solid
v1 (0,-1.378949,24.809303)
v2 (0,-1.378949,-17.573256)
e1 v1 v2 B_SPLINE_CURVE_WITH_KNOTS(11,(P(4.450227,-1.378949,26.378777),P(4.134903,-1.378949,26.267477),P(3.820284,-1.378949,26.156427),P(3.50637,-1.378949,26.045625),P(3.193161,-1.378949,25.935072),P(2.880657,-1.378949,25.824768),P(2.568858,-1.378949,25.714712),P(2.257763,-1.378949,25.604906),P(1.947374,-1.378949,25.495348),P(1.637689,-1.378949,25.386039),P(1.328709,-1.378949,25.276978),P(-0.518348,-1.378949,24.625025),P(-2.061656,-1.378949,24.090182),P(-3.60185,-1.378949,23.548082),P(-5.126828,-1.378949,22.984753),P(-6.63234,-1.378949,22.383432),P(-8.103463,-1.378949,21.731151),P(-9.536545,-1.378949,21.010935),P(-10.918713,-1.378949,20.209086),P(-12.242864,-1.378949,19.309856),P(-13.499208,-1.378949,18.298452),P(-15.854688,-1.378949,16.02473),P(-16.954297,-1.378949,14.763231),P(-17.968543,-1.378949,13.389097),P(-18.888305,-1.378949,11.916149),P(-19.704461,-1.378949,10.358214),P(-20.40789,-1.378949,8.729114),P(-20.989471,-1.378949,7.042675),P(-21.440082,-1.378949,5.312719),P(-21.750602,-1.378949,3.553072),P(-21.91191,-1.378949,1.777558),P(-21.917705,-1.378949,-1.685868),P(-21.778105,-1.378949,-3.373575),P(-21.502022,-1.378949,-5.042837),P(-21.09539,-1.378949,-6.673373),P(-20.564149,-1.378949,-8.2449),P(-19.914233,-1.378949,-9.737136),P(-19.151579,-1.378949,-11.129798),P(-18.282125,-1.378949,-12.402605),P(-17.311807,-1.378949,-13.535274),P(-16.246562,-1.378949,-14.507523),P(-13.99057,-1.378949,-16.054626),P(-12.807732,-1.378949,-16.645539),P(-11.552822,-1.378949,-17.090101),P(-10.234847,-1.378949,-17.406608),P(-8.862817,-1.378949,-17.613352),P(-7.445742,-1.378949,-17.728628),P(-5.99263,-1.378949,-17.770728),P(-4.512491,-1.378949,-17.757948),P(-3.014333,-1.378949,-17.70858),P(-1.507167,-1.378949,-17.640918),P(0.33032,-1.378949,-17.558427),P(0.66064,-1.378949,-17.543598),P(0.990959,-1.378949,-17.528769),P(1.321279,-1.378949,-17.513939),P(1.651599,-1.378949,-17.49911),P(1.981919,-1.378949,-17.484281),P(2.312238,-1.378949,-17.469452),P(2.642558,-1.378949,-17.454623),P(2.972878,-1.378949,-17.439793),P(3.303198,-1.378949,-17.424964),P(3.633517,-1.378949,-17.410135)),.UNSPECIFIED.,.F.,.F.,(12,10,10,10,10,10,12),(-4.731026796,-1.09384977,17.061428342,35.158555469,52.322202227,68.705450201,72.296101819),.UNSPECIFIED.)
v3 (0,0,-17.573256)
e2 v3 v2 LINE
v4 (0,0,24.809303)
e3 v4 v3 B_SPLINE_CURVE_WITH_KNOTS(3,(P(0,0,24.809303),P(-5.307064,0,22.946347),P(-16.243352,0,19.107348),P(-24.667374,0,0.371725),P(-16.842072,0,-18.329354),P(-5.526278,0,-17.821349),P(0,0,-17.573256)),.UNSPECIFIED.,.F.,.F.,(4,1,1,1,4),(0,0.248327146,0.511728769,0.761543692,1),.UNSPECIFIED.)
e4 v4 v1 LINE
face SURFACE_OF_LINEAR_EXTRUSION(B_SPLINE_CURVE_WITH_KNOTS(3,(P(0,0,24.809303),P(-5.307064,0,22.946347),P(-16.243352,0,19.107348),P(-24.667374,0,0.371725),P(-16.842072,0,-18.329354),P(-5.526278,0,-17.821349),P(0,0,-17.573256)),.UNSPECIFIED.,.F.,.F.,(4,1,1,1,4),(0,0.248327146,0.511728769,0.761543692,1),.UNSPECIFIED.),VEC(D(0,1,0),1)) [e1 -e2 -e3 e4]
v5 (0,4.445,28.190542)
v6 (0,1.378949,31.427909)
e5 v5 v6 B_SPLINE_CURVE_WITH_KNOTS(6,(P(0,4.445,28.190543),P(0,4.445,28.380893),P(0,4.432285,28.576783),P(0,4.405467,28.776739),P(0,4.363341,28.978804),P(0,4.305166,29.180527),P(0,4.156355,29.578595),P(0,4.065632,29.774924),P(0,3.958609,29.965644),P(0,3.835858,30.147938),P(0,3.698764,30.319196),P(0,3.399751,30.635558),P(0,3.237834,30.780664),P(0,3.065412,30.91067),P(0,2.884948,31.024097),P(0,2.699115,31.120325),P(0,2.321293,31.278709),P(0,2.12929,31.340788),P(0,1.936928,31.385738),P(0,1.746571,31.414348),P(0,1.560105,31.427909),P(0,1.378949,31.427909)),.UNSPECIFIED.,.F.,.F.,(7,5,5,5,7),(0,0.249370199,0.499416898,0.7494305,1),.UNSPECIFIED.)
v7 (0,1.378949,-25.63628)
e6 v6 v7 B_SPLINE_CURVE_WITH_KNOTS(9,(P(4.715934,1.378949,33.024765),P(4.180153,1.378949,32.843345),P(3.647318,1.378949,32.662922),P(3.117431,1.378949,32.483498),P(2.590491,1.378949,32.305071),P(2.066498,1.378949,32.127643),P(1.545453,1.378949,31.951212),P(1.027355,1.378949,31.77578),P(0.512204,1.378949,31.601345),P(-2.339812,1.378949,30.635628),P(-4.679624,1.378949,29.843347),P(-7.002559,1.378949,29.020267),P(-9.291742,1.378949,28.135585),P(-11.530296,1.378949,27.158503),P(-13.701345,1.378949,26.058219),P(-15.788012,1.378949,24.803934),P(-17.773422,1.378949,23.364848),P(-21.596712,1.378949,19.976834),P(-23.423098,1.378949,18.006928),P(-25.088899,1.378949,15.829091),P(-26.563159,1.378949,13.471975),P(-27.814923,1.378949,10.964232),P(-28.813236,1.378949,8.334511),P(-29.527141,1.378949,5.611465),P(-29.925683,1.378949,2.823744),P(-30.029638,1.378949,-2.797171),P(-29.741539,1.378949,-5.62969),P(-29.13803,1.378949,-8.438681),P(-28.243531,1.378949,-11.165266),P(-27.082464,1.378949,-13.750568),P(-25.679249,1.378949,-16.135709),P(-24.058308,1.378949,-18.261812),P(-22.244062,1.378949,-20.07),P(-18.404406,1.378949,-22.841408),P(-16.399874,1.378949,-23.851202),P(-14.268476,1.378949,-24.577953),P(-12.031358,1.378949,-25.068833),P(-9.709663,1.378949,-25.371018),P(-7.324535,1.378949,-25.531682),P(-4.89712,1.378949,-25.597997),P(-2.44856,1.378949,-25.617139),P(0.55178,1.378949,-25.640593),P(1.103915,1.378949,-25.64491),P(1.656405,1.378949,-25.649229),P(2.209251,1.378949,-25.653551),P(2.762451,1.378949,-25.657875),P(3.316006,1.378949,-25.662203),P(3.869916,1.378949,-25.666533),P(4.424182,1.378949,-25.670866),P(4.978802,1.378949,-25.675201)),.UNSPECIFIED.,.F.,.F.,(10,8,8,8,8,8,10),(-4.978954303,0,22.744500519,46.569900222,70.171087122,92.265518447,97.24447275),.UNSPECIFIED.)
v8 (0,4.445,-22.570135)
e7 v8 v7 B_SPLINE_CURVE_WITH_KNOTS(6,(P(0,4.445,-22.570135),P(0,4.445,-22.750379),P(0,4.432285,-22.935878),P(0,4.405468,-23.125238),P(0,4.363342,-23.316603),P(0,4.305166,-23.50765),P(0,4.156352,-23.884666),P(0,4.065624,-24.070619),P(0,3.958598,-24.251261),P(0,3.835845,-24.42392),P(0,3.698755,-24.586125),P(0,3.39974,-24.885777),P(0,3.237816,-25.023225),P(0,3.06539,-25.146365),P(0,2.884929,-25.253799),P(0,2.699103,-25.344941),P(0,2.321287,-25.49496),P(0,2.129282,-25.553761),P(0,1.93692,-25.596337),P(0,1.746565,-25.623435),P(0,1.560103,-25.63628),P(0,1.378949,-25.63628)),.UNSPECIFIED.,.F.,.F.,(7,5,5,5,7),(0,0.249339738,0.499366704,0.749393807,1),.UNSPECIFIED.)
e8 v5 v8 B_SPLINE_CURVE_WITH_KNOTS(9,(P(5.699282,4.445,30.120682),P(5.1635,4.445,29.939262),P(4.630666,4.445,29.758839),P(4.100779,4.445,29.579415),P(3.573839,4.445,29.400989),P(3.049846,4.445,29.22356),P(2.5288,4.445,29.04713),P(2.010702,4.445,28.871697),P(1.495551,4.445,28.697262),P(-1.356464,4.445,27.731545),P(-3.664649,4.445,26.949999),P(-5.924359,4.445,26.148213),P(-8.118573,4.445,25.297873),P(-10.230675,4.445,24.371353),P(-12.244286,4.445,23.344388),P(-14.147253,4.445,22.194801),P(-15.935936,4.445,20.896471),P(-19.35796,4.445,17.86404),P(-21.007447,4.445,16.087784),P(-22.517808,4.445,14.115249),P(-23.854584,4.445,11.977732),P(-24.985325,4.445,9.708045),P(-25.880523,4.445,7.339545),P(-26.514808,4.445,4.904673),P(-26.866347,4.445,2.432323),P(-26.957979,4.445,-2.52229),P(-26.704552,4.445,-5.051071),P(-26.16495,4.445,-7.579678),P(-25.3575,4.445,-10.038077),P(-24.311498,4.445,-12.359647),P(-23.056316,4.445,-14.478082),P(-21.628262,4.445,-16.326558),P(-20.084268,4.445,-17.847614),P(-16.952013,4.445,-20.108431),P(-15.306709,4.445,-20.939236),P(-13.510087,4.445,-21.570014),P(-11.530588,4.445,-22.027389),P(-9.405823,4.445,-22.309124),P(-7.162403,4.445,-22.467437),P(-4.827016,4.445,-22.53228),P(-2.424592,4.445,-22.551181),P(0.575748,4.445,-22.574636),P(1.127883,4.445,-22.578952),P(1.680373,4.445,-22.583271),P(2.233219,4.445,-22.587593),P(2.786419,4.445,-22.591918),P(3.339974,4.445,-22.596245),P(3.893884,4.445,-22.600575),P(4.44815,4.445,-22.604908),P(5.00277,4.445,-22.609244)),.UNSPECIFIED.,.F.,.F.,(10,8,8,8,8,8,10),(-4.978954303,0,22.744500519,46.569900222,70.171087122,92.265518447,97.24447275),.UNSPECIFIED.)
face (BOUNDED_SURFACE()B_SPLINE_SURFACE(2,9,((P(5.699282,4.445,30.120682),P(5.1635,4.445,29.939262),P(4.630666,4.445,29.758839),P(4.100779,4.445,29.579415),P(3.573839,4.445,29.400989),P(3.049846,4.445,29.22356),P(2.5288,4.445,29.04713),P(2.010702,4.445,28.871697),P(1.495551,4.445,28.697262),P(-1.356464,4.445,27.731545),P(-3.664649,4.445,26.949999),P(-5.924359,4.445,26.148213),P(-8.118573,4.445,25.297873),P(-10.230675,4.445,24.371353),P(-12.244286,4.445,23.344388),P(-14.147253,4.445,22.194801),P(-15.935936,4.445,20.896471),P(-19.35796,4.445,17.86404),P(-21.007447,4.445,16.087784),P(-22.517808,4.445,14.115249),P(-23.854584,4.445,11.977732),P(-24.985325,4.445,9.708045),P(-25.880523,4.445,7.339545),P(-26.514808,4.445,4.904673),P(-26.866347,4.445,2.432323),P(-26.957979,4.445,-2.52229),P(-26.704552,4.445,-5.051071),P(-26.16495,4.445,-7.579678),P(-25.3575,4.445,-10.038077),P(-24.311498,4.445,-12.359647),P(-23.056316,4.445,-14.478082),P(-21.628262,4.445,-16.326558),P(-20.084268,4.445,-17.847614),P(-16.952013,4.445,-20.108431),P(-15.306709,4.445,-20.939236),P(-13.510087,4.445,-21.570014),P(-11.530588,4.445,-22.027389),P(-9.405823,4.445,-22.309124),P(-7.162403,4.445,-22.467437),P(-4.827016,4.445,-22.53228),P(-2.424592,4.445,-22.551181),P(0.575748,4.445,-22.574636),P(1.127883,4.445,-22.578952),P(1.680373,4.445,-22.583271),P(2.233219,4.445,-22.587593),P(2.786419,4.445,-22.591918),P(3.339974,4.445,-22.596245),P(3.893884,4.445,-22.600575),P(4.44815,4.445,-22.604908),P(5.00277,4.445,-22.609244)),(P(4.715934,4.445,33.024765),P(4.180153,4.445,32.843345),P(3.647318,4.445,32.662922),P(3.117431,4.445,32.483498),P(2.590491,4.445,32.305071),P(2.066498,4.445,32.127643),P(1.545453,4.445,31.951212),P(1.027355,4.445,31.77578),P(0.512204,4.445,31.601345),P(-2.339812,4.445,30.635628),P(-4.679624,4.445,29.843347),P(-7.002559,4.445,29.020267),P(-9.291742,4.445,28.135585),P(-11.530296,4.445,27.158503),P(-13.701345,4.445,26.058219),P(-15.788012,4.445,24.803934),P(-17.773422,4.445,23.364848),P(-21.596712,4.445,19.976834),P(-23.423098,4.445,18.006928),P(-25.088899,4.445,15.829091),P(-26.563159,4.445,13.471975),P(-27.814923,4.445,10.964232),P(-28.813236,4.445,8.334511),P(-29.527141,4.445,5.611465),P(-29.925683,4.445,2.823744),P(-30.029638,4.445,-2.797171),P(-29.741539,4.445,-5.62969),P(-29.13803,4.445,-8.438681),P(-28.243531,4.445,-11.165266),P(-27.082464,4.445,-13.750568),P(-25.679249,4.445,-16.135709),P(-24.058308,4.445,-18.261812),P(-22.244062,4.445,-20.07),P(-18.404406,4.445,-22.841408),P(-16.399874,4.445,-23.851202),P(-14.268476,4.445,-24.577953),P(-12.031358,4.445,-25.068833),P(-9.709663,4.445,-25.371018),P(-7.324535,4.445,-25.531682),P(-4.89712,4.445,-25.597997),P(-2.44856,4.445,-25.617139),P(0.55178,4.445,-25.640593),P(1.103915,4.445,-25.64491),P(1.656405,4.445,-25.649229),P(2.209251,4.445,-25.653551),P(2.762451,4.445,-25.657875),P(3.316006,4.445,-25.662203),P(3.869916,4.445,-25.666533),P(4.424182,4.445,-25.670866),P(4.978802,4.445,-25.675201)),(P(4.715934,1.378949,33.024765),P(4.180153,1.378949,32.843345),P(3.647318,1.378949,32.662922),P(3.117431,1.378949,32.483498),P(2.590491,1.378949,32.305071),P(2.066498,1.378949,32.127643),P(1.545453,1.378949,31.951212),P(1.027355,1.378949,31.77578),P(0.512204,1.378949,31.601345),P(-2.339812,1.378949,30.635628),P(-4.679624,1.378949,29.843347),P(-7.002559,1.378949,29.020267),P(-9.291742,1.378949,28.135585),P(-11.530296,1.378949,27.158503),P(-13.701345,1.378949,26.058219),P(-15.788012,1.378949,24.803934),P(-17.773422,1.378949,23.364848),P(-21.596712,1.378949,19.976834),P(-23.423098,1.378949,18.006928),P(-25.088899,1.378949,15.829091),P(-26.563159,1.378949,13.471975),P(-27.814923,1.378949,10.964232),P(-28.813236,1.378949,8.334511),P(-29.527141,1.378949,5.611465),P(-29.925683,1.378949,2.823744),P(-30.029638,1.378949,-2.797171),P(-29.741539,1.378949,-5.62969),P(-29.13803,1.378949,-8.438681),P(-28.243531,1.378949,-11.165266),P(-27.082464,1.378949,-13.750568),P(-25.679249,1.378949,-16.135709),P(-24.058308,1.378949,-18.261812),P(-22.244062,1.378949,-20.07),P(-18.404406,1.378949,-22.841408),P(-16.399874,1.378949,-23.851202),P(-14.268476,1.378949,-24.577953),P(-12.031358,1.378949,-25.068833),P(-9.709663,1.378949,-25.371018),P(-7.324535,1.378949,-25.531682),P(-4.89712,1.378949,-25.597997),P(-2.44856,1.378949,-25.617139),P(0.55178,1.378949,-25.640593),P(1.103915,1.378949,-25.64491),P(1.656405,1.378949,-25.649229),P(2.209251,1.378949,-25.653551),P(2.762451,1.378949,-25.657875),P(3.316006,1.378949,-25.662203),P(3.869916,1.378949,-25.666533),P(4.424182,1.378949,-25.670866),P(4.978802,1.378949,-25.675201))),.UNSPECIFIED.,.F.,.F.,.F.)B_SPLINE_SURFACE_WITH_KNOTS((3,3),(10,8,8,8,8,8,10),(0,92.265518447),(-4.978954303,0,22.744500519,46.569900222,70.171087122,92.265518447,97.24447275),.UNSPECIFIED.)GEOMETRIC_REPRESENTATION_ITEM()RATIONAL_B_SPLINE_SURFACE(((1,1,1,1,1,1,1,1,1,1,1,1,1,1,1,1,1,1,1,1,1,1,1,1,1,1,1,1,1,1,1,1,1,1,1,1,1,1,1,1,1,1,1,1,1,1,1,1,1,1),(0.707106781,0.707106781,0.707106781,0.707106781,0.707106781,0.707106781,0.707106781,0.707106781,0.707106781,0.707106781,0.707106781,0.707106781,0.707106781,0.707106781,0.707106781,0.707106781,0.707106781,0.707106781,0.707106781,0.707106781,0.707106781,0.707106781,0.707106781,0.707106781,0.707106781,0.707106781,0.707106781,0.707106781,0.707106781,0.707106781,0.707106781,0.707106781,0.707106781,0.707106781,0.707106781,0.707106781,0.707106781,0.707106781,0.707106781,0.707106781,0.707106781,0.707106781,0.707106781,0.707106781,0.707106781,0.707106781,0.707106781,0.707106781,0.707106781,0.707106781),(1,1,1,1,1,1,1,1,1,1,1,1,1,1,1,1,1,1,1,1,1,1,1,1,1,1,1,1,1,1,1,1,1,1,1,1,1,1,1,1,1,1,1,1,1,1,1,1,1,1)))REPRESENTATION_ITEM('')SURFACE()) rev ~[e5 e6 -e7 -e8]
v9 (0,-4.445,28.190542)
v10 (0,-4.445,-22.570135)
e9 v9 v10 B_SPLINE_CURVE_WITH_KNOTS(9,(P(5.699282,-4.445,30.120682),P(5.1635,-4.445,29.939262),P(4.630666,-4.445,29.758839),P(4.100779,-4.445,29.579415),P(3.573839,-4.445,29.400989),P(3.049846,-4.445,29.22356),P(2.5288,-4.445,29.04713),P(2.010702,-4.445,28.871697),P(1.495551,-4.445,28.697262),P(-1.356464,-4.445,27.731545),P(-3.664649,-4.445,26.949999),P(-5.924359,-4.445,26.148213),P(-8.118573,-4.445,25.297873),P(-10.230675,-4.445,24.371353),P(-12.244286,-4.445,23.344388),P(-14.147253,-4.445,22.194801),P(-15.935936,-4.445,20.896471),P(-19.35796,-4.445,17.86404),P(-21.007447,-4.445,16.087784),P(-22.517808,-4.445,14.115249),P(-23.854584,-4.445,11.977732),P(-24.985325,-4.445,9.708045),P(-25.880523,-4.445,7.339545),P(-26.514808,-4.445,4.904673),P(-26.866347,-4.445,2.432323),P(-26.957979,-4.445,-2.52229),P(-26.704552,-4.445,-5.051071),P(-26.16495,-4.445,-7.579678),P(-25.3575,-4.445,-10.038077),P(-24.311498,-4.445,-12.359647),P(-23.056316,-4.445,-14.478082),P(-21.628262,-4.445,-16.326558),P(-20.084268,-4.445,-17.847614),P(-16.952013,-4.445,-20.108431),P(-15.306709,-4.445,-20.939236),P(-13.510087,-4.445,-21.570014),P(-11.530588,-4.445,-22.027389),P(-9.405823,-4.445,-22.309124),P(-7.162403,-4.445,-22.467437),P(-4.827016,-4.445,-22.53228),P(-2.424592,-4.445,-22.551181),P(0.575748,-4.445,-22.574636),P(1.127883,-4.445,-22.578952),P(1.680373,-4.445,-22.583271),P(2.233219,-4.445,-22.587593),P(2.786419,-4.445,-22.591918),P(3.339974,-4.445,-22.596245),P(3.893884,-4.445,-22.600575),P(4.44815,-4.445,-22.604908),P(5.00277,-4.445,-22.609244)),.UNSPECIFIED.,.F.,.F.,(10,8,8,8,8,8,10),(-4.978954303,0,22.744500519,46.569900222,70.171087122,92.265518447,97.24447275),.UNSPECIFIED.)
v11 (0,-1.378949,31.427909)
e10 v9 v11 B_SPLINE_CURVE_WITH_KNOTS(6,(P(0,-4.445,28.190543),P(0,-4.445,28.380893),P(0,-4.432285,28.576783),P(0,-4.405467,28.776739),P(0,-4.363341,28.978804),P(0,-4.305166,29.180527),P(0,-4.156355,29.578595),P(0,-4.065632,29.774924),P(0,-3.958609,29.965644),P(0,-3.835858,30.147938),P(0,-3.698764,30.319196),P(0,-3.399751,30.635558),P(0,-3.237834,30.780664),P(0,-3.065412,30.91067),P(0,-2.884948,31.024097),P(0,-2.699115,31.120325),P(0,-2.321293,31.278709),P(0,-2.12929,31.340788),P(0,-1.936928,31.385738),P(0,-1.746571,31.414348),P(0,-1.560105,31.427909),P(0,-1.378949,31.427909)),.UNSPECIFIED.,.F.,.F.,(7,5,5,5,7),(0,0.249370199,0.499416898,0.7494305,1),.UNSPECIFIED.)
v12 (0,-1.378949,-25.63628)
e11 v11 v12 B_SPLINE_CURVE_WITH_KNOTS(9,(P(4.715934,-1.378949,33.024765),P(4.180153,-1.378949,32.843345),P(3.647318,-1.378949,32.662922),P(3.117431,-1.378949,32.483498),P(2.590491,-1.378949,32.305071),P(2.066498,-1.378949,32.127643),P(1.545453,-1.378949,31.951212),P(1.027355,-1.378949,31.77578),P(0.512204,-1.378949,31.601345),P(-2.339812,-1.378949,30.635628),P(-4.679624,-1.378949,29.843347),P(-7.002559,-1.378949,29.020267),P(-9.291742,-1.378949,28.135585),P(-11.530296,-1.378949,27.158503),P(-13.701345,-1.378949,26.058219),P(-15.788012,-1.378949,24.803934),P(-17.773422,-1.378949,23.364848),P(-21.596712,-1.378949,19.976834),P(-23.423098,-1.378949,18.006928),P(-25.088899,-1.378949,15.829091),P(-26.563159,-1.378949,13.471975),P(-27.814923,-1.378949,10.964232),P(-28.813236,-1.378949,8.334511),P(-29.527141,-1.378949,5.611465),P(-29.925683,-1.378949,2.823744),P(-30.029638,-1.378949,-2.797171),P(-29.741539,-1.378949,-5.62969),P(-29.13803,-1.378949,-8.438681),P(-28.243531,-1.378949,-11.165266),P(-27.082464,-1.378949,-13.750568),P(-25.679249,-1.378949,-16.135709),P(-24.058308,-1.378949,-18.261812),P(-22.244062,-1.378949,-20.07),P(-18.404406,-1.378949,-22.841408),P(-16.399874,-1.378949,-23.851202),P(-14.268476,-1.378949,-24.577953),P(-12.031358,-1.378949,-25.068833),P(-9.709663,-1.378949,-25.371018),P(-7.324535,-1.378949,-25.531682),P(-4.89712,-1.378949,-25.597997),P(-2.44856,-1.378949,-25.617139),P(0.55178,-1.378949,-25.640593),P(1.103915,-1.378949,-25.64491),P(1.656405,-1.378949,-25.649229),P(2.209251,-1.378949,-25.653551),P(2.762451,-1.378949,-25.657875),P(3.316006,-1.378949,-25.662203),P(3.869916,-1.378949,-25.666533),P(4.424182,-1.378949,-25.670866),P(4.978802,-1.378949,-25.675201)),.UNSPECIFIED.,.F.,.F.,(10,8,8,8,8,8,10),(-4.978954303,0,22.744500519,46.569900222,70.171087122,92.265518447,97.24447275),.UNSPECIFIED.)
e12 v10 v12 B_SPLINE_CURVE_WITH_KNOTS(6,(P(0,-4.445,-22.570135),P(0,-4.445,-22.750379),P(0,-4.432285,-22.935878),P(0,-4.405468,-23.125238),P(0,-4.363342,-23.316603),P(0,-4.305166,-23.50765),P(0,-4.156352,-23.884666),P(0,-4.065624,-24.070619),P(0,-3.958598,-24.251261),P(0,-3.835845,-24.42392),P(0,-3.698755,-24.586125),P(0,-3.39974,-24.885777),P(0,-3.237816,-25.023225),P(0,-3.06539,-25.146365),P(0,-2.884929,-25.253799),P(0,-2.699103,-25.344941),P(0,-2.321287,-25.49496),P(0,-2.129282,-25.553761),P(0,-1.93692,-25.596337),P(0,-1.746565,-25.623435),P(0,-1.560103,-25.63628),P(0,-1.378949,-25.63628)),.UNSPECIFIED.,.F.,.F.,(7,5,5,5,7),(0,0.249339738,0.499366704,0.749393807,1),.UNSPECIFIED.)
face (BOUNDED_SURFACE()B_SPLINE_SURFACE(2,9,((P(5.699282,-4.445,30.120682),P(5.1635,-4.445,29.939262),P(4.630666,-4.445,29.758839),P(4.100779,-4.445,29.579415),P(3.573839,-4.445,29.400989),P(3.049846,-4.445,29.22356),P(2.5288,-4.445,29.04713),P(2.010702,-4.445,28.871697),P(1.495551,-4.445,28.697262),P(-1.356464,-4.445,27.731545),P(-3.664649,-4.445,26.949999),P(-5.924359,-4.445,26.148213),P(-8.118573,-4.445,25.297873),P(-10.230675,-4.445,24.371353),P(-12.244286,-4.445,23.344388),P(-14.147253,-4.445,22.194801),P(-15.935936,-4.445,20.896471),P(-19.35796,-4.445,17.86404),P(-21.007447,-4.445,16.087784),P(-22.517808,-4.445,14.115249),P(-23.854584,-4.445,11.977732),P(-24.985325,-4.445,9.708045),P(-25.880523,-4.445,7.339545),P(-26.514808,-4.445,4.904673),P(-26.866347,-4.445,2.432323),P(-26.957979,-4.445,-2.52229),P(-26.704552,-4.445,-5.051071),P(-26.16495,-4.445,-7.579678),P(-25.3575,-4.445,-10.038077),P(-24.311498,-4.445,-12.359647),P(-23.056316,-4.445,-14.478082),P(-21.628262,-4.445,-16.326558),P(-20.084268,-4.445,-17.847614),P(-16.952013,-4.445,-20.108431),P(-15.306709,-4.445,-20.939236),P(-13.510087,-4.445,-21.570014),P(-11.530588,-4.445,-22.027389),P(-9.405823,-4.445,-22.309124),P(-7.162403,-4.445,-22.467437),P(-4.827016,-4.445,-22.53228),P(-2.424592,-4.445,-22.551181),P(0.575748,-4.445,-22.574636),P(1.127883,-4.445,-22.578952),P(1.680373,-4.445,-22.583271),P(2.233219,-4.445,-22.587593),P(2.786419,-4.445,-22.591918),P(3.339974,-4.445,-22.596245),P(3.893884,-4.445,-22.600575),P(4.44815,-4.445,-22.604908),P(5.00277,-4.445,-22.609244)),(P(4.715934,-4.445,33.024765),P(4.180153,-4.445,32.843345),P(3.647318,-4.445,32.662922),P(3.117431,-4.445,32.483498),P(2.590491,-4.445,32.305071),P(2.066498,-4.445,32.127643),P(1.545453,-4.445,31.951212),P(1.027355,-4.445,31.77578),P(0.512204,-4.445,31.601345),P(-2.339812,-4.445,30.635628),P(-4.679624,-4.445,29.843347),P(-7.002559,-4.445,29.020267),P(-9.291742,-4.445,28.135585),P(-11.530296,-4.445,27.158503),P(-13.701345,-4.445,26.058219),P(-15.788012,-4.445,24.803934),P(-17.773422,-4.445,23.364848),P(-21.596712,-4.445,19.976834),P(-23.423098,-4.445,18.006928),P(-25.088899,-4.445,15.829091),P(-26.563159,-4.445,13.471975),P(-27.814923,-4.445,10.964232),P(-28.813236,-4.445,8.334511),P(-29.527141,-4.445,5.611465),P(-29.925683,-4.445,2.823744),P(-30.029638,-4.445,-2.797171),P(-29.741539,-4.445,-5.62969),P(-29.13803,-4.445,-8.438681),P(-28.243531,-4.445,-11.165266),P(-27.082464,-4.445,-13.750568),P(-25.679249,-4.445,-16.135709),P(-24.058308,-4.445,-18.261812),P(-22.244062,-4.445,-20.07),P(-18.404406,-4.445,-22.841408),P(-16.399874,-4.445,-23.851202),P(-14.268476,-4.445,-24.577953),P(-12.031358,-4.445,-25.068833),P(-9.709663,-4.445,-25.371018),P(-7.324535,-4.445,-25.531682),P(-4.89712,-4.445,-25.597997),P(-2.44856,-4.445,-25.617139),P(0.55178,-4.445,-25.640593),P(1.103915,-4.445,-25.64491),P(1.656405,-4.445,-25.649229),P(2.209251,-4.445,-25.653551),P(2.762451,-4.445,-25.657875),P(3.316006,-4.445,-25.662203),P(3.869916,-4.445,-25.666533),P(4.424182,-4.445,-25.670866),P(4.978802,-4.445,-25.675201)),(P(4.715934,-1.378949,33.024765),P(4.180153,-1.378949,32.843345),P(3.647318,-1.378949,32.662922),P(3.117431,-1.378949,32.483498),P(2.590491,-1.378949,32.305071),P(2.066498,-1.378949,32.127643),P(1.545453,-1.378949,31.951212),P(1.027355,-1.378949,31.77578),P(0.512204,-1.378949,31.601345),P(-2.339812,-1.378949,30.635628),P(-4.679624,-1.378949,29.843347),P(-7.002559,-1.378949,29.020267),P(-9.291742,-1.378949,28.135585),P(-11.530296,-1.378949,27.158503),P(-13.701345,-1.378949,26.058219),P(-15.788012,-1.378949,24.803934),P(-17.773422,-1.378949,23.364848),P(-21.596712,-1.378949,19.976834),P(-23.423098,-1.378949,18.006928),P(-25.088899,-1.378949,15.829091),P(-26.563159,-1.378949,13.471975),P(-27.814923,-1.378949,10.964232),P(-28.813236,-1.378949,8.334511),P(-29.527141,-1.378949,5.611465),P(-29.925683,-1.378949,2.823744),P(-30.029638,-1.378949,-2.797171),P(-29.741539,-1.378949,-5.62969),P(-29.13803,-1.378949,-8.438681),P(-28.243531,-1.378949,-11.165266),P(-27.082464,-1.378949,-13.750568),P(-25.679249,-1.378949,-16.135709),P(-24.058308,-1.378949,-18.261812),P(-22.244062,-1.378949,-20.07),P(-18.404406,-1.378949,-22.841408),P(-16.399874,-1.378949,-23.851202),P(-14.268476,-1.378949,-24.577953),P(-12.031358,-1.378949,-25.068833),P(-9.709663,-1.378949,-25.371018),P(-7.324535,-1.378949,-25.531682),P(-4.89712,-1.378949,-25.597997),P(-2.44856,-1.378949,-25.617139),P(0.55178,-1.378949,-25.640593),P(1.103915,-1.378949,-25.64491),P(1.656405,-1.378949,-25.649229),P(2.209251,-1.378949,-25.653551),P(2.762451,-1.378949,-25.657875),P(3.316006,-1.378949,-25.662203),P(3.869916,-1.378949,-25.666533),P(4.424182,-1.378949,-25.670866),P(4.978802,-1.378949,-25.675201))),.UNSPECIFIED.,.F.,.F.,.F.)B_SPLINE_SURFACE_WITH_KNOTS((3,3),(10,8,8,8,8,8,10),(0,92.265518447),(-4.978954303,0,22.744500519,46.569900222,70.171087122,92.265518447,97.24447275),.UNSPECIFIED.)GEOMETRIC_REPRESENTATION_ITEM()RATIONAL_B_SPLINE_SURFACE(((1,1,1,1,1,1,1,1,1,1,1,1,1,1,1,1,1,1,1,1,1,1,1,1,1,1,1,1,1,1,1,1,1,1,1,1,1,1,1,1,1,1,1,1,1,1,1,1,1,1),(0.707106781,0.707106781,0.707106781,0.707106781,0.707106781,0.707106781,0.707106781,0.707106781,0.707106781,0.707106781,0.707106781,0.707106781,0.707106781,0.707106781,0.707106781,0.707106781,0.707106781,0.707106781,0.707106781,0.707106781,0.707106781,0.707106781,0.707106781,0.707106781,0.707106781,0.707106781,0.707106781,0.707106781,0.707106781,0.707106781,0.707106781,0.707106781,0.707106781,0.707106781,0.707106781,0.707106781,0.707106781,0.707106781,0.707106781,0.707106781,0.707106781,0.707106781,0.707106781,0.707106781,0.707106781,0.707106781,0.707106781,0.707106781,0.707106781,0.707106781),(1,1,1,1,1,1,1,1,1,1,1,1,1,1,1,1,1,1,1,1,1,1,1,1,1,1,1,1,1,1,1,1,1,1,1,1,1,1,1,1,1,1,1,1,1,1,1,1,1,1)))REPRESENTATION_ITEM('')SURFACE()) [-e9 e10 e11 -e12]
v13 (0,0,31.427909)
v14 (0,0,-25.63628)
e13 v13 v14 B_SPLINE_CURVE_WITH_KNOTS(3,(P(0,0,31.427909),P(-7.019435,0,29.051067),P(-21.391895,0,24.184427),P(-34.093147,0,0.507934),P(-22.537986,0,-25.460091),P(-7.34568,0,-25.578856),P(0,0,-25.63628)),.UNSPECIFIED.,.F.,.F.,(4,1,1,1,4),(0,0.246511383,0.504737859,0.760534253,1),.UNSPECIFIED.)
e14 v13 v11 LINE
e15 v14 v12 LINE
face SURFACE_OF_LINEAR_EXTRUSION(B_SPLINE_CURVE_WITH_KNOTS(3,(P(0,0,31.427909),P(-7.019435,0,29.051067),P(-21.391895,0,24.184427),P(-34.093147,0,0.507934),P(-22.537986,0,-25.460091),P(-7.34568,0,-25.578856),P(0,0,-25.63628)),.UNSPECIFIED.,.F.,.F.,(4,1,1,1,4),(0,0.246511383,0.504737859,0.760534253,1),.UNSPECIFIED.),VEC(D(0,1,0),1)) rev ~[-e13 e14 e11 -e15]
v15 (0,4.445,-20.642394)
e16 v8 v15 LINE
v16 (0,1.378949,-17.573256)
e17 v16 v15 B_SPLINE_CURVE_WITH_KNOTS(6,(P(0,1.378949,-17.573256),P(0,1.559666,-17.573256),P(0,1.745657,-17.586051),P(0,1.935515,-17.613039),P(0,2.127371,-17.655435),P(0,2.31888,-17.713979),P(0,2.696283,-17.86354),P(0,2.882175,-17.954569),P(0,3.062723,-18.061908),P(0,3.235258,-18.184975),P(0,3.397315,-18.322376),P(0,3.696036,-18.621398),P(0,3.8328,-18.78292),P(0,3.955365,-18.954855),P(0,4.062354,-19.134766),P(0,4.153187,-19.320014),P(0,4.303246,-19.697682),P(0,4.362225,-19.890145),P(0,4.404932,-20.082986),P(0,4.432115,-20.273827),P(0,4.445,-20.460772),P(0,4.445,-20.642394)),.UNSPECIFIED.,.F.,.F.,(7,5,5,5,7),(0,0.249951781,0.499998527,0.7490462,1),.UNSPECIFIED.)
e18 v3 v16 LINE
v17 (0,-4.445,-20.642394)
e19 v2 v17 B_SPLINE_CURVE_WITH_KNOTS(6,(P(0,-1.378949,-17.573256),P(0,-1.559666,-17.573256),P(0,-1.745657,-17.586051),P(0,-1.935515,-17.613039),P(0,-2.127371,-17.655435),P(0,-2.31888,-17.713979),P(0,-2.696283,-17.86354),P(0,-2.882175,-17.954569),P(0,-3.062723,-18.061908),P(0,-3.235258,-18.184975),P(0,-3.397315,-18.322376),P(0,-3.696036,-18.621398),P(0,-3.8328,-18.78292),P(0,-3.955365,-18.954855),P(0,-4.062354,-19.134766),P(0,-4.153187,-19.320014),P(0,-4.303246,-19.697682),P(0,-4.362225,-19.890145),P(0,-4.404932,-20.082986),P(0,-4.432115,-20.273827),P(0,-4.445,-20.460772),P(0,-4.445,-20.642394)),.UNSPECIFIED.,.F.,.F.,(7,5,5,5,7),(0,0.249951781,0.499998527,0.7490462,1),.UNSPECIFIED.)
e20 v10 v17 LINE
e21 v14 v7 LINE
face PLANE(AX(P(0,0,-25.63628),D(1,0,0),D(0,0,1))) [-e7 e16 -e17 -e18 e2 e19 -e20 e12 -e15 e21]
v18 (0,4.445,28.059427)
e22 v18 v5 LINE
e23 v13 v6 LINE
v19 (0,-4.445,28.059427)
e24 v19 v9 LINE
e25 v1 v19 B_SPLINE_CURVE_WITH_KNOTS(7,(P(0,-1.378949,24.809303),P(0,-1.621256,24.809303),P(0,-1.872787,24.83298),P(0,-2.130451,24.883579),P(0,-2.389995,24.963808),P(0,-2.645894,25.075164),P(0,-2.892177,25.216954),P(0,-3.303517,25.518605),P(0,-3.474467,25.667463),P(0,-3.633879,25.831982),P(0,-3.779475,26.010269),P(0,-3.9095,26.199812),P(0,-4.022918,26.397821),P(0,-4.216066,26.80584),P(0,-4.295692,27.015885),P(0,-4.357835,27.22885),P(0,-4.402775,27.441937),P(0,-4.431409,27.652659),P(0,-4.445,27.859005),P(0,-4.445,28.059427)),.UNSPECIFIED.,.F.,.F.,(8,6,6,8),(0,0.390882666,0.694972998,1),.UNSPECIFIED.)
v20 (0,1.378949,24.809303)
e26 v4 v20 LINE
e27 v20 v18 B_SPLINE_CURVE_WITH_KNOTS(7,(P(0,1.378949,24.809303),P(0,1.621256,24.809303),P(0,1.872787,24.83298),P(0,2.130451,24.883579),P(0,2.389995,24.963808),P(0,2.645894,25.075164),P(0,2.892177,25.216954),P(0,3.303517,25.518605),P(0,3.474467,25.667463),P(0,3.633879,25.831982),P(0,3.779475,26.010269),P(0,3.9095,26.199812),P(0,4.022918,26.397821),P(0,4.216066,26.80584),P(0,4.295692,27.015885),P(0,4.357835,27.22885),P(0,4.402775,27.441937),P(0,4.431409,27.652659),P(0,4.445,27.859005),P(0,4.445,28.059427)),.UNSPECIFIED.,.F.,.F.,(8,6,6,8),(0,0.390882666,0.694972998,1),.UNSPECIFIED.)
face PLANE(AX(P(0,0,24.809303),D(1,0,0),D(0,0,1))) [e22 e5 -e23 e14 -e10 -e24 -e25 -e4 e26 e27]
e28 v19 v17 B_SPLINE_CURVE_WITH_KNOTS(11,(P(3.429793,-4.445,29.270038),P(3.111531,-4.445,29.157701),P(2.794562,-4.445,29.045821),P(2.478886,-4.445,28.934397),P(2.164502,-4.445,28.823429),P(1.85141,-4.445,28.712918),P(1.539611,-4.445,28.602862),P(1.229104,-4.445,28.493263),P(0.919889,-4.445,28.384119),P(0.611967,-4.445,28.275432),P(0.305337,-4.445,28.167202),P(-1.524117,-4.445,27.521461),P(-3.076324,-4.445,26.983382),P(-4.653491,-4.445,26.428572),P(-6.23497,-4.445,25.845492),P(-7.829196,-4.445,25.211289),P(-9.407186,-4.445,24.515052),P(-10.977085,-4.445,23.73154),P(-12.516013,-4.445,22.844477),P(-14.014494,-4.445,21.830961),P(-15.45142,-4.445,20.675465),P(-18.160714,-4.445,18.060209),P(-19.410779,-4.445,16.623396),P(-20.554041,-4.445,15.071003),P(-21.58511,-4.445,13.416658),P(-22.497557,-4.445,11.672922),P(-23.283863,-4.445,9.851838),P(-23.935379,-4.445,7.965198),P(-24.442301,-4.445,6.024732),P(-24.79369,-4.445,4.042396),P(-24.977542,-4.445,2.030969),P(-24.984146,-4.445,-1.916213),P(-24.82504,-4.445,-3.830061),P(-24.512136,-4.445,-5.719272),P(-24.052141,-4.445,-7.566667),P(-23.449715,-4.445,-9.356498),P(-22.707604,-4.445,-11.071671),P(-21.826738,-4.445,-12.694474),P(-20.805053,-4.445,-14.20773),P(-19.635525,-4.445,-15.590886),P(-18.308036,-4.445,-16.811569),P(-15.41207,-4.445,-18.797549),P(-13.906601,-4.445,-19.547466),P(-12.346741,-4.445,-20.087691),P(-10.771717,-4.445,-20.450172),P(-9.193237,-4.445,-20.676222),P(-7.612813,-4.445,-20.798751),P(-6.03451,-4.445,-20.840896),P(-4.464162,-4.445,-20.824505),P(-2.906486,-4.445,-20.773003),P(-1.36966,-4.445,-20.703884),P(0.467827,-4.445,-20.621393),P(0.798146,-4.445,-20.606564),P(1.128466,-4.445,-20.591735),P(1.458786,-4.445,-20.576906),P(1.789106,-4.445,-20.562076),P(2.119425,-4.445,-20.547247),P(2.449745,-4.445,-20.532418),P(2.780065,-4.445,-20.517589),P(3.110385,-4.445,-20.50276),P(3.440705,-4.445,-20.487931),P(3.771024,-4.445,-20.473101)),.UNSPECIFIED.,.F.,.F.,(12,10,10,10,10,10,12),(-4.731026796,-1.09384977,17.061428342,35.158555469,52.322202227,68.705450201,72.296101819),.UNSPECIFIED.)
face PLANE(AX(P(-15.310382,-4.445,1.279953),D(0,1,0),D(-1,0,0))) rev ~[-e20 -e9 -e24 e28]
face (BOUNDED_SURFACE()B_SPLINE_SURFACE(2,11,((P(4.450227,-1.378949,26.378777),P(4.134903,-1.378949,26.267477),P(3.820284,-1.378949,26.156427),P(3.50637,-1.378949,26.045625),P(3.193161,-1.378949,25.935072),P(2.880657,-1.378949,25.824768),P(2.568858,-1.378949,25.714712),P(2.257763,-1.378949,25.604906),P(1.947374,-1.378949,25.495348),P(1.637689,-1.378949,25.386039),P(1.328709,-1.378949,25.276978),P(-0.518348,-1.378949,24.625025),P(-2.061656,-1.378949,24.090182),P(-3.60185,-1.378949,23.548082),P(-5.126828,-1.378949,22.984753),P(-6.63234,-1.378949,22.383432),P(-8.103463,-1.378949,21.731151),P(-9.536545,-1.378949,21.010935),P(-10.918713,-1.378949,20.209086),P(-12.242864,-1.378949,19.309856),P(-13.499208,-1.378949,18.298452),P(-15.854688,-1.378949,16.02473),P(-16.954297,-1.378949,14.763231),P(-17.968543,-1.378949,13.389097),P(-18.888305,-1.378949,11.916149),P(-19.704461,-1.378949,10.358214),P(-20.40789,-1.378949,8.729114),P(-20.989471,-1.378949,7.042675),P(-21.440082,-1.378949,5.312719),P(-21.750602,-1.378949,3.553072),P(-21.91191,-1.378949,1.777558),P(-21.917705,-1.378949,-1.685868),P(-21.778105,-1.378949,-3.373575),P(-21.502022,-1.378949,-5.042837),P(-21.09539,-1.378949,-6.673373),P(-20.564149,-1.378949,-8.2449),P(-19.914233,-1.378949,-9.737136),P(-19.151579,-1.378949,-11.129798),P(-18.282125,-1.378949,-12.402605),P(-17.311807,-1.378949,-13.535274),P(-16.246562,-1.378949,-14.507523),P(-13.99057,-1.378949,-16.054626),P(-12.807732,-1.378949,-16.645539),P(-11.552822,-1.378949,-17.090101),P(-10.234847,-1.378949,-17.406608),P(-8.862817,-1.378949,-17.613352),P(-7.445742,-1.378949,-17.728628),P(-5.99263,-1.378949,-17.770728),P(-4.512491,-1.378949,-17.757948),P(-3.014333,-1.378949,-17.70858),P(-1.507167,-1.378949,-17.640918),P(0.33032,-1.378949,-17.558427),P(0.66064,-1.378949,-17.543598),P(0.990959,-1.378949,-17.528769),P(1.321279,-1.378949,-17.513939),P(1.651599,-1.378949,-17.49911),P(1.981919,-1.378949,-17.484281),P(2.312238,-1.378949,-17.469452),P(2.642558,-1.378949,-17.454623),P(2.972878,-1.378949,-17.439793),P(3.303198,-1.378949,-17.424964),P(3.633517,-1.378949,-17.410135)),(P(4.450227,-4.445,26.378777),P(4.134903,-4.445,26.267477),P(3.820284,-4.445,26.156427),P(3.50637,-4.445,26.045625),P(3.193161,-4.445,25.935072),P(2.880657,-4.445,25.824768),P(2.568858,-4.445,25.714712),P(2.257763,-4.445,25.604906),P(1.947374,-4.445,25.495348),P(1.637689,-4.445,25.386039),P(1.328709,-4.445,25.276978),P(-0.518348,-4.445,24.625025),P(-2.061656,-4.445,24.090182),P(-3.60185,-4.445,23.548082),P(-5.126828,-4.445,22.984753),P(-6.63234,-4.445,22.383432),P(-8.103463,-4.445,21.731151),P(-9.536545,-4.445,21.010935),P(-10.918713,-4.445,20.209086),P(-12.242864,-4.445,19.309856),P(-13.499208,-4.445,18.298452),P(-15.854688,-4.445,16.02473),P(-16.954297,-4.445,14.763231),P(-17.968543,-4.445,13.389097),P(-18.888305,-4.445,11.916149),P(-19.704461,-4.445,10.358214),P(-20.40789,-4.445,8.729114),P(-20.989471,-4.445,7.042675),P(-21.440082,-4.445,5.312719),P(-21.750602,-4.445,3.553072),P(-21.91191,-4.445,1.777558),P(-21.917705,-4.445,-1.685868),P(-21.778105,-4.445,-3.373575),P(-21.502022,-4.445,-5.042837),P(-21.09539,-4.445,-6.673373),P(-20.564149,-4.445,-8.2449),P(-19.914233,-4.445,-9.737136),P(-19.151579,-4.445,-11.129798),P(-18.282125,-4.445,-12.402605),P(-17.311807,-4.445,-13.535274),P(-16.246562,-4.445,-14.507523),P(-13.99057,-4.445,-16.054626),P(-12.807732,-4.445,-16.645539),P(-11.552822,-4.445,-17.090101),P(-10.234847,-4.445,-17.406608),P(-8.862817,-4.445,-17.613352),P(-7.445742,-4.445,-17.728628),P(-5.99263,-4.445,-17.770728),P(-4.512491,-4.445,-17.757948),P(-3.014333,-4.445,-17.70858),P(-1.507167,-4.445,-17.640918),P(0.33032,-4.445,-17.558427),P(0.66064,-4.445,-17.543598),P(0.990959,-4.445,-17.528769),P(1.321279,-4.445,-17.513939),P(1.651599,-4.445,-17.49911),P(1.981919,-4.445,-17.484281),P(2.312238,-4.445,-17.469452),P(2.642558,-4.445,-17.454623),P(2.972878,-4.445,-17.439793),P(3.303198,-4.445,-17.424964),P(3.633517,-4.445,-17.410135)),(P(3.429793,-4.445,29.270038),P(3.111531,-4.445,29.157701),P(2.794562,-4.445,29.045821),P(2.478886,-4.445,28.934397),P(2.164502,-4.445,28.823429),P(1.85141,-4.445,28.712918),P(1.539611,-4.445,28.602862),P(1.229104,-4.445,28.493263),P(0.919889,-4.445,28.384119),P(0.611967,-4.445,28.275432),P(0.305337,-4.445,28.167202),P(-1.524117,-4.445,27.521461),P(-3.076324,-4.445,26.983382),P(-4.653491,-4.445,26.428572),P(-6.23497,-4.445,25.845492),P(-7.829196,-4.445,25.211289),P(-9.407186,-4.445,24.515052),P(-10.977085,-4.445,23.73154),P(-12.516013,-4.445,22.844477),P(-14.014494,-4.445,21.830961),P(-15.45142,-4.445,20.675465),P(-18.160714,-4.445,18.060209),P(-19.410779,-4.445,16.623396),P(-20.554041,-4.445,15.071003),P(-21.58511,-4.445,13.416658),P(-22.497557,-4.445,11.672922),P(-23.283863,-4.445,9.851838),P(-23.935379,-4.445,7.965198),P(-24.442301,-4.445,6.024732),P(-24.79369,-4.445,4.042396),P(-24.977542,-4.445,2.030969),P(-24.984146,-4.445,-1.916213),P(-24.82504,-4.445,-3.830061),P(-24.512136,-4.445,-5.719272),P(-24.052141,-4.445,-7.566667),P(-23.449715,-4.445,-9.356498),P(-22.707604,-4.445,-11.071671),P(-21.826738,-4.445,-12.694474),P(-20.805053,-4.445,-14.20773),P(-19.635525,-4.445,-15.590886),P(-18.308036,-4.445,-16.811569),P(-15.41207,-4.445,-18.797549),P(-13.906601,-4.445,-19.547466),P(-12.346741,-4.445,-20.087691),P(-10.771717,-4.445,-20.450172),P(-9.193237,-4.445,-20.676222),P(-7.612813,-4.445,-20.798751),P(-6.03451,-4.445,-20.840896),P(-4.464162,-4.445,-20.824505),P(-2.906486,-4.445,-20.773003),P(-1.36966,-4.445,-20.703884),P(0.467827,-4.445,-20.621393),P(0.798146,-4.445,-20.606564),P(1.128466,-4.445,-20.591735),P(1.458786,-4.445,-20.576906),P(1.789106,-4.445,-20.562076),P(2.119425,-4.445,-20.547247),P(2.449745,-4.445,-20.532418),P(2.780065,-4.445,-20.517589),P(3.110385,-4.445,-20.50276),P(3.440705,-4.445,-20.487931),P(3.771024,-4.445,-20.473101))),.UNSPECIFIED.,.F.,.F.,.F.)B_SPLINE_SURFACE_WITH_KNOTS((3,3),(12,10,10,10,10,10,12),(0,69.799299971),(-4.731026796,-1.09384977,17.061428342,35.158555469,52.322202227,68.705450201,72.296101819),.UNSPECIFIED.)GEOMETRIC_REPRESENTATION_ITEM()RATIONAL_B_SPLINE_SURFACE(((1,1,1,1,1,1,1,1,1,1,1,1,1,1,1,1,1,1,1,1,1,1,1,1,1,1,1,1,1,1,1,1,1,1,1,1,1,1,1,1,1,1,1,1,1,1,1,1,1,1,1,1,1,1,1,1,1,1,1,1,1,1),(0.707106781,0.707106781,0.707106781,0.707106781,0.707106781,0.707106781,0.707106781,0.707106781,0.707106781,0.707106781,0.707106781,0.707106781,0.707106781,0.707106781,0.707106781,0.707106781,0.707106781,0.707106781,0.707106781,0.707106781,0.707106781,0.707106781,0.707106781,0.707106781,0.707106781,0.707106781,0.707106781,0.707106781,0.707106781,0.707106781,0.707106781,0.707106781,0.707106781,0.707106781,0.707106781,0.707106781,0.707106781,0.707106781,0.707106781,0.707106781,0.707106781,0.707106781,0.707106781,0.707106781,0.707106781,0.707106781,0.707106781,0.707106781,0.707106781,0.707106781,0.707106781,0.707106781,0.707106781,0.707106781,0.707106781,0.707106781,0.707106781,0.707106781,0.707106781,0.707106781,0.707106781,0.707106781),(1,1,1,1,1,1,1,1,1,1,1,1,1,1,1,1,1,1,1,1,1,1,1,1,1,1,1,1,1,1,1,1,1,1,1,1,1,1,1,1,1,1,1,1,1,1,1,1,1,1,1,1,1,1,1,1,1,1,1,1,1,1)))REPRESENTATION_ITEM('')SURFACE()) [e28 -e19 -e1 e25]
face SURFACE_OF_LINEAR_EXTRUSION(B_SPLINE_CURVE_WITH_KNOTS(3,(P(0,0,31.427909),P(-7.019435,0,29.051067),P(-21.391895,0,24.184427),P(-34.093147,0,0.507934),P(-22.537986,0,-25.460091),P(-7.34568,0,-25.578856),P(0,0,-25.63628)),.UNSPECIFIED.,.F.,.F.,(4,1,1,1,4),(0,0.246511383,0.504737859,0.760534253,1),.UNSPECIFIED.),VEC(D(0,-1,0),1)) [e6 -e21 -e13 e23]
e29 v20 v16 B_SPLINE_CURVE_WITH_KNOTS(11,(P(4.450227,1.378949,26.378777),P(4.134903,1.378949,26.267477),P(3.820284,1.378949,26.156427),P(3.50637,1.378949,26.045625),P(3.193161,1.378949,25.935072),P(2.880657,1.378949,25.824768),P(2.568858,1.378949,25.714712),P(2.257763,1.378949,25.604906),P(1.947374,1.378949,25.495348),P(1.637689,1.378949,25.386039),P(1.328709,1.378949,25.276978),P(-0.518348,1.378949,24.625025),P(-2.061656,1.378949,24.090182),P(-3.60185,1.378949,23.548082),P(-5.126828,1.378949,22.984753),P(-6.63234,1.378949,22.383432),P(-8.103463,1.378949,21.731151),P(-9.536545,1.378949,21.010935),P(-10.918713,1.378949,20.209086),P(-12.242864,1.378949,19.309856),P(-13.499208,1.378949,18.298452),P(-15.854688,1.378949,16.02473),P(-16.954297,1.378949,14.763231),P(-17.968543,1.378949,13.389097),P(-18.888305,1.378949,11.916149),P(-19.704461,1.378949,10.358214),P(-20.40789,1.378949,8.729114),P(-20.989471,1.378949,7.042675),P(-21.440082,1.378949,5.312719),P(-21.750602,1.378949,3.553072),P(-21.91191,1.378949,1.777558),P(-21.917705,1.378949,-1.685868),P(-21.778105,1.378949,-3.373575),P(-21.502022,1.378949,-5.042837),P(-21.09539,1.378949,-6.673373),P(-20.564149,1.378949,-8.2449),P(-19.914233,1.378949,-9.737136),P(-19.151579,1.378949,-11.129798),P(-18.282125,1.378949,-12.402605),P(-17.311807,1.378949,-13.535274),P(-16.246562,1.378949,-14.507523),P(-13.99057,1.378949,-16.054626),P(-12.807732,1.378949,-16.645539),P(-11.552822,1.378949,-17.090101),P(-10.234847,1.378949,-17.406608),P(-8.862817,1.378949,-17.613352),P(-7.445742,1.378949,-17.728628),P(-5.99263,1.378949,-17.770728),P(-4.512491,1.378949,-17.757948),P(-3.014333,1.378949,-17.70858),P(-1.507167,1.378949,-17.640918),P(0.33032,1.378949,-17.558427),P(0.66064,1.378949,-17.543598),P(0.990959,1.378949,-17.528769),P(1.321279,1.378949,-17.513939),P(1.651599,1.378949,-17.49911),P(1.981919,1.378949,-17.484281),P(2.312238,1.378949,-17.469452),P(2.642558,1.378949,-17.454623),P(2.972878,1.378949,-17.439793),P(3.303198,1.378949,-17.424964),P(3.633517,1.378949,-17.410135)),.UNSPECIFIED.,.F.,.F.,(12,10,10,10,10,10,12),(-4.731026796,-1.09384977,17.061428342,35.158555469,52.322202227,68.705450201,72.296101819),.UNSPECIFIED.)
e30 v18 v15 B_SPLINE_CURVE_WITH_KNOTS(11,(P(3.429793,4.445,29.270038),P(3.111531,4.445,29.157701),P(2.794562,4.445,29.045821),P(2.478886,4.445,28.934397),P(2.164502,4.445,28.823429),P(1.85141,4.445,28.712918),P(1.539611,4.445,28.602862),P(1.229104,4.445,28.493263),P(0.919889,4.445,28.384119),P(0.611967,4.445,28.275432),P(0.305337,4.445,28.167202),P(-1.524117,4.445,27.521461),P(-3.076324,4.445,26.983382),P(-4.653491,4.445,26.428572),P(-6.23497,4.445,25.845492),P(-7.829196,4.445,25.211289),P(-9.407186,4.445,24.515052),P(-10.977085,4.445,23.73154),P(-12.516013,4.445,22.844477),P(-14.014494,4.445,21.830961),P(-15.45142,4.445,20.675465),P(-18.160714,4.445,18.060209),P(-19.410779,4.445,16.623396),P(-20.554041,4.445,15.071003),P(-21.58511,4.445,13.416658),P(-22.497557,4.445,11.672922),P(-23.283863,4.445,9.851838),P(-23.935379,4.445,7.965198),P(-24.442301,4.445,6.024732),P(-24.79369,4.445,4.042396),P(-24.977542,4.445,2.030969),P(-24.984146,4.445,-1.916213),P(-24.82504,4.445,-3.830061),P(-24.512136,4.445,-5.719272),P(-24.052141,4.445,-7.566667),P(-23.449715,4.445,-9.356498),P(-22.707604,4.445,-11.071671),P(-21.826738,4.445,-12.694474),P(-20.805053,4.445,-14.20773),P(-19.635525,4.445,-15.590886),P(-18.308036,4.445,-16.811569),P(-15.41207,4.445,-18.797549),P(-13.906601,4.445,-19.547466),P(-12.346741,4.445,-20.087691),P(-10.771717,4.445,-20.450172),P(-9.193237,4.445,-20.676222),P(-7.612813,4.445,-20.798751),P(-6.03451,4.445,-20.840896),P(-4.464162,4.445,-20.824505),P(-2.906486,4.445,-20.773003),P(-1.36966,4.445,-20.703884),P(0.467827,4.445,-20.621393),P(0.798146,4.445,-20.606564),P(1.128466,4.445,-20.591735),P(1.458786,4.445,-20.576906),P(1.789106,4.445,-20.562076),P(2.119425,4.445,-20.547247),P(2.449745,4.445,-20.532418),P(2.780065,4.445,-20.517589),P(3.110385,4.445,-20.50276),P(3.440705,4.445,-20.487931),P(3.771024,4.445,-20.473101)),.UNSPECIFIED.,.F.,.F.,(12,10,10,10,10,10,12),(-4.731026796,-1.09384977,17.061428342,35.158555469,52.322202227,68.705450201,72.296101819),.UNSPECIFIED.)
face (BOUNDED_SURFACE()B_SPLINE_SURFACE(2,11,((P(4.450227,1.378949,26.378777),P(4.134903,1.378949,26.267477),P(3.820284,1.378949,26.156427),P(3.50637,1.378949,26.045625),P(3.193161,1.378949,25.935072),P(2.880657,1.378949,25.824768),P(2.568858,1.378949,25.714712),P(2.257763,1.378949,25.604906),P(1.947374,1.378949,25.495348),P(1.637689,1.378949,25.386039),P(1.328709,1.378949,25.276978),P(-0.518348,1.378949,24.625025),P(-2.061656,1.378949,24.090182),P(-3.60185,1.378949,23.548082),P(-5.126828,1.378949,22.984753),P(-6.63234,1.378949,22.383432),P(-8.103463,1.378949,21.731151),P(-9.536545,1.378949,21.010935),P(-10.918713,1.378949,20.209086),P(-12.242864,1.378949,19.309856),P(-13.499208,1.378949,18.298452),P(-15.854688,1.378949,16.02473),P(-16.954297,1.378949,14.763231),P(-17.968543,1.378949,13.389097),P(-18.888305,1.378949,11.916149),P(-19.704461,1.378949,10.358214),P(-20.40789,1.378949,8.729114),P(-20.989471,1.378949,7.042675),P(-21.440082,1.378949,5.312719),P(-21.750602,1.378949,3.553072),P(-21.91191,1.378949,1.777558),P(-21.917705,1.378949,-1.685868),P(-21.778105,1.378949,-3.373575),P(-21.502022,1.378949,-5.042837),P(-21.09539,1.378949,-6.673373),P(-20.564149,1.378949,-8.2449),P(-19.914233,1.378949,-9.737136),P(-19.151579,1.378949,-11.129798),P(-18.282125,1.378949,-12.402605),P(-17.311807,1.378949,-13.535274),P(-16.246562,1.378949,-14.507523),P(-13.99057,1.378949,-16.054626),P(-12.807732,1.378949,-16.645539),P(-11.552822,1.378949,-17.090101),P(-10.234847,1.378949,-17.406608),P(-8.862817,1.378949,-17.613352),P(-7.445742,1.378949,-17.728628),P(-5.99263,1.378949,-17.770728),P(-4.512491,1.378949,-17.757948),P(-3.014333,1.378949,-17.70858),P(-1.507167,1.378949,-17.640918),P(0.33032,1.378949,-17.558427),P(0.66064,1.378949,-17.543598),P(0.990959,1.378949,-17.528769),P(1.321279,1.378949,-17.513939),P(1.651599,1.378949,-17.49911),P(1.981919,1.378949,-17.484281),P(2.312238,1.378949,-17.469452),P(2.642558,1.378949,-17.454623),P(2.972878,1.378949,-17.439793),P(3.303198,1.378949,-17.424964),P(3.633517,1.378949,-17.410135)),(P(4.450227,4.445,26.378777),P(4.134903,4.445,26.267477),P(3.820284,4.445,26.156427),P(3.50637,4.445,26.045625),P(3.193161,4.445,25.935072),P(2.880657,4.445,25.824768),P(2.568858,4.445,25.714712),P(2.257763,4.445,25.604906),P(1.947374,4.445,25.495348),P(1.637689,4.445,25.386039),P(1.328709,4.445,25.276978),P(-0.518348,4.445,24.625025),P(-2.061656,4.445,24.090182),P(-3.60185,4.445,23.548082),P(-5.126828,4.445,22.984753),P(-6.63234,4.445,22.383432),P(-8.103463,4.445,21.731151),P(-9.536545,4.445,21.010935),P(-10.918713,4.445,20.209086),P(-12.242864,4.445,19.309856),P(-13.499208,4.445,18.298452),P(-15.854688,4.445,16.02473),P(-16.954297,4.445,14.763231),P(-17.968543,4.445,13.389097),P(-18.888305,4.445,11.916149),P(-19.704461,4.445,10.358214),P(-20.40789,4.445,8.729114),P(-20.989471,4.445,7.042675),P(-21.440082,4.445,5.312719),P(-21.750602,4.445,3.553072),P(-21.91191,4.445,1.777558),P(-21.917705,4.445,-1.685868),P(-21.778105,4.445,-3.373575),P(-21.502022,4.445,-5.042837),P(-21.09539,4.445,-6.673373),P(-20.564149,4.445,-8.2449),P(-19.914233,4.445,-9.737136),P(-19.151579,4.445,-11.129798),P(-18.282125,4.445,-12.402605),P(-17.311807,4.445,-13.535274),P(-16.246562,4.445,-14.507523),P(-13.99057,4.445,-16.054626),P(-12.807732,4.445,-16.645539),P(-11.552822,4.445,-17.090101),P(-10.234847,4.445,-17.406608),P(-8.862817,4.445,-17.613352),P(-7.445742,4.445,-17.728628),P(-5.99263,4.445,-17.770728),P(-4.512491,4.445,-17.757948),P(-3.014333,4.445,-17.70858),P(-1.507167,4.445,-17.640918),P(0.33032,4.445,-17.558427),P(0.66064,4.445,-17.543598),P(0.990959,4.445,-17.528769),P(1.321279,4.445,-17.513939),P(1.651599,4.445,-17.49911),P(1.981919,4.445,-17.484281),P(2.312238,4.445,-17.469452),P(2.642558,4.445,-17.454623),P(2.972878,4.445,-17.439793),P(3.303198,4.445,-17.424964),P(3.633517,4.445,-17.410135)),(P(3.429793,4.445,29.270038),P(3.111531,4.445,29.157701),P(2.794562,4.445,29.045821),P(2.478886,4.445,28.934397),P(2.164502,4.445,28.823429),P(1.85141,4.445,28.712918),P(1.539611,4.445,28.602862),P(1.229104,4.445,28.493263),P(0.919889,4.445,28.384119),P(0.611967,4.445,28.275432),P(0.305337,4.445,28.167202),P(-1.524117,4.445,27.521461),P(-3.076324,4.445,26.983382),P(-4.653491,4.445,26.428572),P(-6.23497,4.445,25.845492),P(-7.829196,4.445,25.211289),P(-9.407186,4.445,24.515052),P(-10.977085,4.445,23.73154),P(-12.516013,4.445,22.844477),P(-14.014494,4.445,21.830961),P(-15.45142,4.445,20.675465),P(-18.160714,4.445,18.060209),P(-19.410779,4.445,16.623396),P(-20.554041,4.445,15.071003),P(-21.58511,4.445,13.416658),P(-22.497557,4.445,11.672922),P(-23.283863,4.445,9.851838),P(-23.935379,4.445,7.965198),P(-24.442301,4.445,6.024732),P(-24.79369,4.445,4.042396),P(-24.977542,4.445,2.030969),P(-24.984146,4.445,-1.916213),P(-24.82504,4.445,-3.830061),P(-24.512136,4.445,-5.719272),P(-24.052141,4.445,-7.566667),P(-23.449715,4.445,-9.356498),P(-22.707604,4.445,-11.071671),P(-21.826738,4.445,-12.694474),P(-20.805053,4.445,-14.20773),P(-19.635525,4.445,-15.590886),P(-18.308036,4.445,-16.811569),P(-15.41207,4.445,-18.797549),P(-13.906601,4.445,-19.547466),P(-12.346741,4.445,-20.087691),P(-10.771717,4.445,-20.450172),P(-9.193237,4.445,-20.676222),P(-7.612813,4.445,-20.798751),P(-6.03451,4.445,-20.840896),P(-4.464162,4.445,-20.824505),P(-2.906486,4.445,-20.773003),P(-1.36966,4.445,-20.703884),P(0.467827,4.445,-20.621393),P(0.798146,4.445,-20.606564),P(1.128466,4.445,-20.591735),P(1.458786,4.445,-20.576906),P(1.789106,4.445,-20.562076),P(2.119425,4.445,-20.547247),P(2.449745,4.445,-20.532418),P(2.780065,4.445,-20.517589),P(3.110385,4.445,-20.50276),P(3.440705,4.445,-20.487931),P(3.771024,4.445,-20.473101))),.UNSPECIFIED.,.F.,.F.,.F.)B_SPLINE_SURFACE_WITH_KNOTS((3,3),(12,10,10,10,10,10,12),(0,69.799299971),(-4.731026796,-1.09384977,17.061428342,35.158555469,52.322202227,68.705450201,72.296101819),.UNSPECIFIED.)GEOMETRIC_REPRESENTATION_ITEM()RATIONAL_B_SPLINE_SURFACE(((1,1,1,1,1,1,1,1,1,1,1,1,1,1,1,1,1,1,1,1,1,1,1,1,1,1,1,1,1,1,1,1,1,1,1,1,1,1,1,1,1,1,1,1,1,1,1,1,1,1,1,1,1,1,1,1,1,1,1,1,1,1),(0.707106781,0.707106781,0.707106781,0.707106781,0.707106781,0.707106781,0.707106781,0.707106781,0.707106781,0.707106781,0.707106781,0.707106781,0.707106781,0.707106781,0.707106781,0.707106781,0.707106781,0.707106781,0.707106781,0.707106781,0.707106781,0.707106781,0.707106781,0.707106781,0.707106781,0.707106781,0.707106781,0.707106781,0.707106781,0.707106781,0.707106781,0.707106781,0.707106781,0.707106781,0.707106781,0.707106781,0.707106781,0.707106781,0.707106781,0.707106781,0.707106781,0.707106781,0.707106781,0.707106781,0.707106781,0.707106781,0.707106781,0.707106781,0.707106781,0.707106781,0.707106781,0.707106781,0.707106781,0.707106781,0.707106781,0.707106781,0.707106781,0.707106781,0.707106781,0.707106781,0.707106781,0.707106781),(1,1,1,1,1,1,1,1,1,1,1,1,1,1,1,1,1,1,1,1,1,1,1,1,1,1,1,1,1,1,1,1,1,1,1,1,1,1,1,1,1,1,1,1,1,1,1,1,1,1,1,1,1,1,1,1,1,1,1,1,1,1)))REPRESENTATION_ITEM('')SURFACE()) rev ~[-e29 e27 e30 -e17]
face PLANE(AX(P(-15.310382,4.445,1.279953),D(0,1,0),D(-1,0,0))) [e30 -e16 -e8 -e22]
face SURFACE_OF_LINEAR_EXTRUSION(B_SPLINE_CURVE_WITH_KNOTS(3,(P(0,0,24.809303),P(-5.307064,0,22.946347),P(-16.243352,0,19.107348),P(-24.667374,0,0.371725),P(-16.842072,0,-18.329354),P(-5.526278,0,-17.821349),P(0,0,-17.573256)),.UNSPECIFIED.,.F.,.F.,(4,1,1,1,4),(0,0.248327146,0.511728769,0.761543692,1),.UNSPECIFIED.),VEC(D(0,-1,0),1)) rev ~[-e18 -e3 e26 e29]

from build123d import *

# Parameters (mm, degrees)
F1_DEPTH = 4.445
F2_R     = 3.0660512242


with BuildPart() as f1:
    # F0 (on Front) → F1 (new body, symmetric)
    with BuildSketch(Plane.XZ):
        with BuildLine():
            add(Edge.make_bspline(
                [(0, 24.8093027622), (-5.3070638963, 22.9463474844), (-16.243352269, 19.1073478904), (-24.6673743675, 0.3717245375), (-16.8420720167, -18.329353742), (-5.5262778619, -17.8213493893), (0, -17.5732560456)],
                knots=[0, 0, 0, 0, 0.2483271457, 0.5117287692, 0.7615436923, 1, 1, 1, 1], degree=3))
            Line((0, 24.8093027622), (0, 31.4279086888))
            add(Edge.make_bspline(
                [(0, 31.4279086888), (-7.0194354851, 29.0510668461), (-21.3918948766, 24.1844272229), (-34.0931470298, 0.5079335618), (-22.5379858632, -25.4600909734), (-7.3456795521, -25.578855667), (0, -25.6362799555)],
                knots=[0, 0, 0, 0, 0.2465113826, 0.5047378588, 0.7605342527, 1, 1, 1, 1], degree=3))
            Line((0, -25.6362799555), (0, -17.5732560456))
        make_face()
    extrude(amount=F1_DEPTH, both=True)

    # F2
    f2_edges = [f1.edges().sort_by_distance(p)[0] for p in [
        (-29.957392, -4.445, 0.657837),
        (-29.957392, 4.445, 0.657837),
        (-21.865566, 4.445, 1.442691),
        (-21.865566, -4.445, 1.442691),
    ]]
    fillet(f2_edges, radius=F2_R)


solid = f1.part
